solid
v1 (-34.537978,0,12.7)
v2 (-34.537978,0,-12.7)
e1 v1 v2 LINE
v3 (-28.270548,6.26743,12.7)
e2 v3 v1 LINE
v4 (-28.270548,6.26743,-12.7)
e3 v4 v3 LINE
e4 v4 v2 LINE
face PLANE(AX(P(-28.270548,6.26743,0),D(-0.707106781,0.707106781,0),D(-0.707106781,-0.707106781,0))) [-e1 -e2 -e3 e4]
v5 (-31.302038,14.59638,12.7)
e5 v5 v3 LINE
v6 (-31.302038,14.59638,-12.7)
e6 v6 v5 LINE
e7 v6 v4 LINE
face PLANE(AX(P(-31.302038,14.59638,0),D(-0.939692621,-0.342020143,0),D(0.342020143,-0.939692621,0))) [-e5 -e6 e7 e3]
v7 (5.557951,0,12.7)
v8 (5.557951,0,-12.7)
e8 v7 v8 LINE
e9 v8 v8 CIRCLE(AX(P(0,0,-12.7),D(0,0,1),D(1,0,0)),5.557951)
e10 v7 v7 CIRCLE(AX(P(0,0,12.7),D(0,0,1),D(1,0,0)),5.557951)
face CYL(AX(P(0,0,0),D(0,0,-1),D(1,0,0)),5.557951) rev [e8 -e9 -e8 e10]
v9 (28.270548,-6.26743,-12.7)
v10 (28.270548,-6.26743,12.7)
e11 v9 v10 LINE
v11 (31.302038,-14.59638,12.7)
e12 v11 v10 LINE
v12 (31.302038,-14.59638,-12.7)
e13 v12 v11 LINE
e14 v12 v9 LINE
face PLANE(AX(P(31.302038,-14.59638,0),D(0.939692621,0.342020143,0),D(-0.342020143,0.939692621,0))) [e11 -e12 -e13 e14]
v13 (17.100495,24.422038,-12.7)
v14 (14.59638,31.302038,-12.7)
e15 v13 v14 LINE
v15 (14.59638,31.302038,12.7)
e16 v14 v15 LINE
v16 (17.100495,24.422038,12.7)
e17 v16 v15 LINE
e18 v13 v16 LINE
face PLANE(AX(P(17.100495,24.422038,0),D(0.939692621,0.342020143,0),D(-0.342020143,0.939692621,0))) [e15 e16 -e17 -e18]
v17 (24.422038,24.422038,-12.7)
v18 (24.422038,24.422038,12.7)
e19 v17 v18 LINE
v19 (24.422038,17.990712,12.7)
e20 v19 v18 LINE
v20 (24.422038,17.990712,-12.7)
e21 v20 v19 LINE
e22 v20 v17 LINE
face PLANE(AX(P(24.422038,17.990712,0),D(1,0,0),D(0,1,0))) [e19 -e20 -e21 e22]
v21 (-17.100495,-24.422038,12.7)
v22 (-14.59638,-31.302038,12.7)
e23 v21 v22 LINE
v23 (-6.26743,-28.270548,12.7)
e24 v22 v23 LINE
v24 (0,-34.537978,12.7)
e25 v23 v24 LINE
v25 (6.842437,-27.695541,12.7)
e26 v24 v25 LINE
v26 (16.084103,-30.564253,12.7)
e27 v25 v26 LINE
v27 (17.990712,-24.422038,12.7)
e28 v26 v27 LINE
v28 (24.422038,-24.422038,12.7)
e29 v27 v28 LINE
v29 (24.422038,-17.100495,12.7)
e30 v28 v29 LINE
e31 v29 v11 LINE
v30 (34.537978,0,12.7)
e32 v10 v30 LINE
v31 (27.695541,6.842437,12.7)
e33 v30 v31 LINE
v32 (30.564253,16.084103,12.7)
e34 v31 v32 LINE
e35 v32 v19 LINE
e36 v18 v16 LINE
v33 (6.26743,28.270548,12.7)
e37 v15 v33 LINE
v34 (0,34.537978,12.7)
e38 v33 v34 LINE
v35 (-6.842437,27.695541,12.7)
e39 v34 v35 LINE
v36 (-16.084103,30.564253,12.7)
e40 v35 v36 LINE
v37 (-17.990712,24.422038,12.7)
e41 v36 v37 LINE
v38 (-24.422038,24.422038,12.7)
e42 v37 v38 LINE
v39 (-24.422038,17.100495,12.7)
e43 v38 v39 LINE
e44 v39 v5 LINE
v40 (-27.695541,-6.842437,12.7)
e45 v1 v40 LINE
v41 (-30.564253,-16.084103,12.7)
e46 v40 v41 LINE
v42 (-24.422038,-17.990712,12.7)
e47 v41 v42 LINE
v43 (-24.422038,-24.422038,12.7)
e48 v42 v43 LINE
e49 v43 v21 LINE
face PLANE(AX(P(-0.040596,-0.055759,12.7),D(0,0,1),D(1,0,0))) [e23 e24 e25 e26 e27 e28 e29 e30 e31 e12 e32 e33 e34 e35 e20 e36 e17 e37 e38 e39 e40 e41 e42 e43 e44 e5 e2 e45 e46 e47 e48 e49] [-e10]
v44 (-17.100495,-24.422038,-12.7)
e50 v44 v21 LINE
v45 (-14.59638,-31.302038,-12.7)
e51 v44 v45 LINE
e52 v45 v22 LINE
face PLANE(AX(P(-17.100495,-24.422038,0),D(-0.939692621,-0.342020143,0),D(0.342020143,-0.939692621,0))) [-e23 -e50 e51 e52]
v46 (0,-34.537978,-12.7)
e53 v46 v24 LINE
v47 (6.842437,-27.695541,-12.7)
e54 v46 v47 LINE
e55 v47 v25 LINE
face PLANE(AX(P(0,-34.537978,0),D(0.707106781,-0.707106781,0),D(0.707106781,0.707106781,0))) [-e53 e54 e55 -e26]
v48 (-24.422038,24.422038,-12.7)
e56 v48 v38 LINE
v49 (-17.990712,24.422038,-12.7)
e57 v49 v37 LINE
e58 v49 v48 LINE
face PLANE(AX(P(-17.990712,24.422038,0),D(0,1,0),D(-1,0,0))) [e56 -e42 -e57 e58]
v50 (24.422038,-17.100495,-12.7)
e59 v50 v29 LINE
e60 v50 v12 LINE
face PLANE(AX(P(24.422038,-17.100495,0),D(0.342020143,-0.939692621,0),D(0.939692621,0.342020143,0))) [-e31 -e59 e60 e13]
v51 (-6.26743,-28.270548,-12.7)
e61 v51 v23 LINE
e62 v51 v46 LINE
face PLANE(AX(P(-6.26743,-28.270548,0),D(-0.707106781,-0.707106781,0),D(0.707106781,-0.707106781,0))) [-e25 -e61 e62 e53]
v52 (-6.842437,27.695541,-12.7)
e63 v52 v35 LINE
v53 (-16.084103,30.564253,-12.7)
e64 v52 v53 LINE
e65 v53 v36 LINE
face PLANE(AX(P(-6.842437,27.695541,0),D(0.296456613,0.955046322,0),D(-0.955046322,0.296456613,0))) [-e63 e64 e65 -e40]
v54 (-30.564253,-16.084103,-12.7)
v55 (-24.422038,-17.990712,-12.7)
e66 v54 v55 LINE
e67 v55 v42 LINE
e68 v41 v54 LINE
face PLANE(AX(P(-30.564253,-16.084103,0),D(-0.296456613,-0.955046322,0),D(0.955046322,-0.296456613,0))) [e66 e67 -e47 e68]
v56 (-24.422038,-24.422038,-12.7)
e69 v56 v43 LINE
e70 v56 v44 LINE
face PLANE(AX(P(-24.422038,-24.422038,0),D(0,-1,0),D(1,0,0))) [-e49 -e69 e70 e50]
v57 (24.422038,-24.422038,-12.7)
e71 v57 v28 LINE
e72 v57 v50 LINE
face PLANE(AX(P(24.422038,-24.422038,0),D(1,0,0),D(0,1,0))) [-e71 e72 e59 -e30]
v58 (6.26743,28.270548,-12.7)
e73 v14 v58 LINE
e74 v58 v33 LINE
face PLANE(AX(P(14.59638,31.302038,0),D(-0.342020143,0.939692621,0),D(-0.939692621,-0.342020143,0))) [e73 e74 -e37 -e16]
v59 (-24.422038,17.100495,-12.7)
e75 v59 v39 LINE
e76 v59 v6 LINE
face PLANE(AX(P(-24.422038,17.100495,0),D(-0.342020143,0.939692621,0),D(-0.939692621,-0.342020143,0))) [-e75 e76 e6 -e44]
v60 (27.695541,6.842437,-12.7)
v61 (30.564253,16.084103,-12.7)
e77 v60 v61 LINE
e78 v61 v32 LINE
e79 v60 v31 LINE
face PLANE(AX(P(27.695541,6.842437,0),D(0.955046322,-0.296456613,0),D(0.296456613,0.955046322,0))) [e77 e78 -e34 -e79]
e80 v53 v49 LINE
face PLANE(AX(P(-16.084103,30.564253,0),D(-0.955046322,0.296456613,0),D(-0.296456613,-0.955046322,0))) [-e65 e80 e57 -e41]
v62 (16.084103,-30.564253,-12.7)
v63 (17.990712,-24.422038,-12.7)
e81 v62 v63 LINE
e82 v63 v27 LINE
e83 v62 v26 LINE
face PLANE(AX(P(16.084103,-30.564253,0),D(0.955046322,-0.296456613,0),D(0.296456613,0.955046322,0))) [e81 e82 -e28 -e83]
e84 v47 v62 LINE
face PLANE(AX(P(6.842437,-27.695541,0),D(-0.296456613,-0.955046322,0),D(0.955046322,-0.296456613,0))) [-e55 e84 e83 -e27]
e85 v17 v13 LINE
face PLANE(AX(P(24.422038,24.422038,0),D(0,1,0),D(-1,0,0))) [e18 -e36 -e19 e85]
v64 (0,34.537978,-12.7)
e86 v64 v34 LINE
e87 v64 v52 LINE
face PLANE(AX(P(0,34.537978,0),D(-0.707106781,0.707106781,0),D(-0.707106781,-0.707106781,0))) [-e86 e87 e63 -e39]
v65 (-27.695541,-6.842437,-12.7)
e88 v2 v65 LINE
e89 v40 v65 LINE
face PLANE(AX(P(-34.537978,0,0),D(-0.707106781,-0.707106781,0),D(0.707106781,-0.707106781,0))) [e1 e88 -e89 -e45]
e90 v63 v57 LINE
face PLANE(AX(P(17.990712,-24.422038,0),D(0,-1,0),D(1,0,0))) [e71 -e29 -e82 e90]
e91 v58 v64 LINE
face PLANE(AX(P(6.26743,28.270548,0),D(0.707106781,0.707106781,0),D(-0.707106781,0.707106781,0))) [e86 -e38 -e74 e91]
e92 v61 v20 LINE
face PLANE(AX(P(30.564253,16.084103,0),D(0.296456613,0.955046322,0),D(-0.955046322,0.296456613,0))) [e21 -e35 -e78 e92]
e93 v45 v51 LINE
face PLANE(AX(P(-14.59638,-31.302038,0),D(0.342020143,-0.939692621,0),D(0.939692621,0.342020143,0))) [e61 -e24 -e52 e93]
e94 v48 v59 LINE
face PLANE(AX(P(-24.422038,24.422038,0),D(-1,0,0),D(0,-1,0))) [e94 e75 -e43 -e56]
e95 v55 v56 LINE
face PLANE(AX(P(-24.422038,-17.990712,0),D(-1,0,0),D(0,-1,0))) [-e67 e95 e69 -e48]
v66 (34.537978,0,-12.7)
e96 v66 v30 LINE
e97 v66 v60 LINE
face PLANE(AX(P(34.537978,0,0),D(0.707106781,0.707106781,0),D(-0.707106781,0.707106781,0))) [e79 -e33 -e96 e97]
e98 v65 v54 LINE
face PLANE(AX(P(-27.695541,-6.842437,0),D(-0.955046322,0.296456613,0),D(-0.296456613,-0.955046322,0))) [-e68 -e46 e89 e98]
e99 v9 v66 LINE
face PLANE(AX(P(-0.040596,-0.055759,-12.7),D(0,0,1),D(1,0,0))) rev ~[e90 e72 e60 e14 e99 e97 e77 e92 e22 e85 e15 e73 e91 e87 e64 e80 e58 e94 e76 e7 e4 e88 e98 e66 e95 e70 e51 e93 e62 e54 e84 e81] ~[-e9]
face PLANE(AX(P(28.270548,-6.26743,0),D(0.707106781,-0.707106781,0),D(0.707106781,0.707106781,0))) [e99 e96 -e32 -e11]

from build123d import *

# Parameters (mm, degrees)
F0_R     = 5.5579508341
F1_DEPTH = 12.7


with BuildPart() as f1:
    # F0 (on Top) → F1 (new body, symmetric)
    with BuildSketch(Plane.XY):
        with BuildLine():
            ThreePointArc((27.919055077, -5.3017102181), (28.2929762045, -2.6625673927), (28.4179831732, 0))
            ThreePointArc((28.4179831732, 0), (28.2207898632, 3.3419735383), (27.6319465947, 6.6375669502))
            ThreePointArc((27.6319465947, 6.6375669502), (27.588477608, 6.8159864218), (27.5438565796, 6.9941212708))
            ThreePointArc((27.5438565796, 6.9941212708), (20.0945486094, 20.0945486094), (6.9941212708, 27.5438565796))
            ThreePointArc((6.9941212708, 27.5438565796), (6.1507773069, 27.7443635024), (5.3017102181, 27.919055077))
            ThreePointArc((5.3017102181, 27.919055077), (2.6625673927, 28.2929762045), (0, 28.4179831732))
            ThreePointArc((0, 28.4179831732), (-3.3419735383, 28.2207898632), (-6.6375669502, 27.6319465947))
            ThreePointArc((-6.6375669502, 27.6319465947), (-6.8159864218, 27.588477608), (-6.9941212708, 27.5438565796))
            ThreePointArc((-6.9941212708, 27.5438565796), (-13.3962958665, 25.0623427613), (-19.0164091945, 21.1177164717))
            ThreePointArc((-19.0164091945, 21.1177164717), (-20.5718228566, 19.6056591827), (-22.0073683293, 17.9793633605))
            ThreePointArc((-22.0073683293, 17.9793633605), (-25.3771522917, 12.7899143545), (-27.5438565796, 6.9941212708))
            ThreePointArc((-27.5438565796, 6.9941212708), (-27.7443635024, 6.1507773069), (-27.919055077, 5.3017102181))
            ThreePointArc((-27.919055077, 5.3017102181), (-28.409770001, -0.6831808855), (-27.6319465947, -6.6375669502))
            ThreePointArc((-27.6319465947, -6.6375669502), (-27.588477608, -6.8159864218), (-27.5438565796, -6.9941212708))
            ThreePointArc((-27.5438565796, -6.9941212708), (-26.2547930089, -10.8750913416), (-24.4220383465, -14.5308571885))
            ThreePointArc((-24.4220383465, -14.5308571885), (-22.8800647164, -16.8548036537), (-21.1177164717, -19.0164091945))
            ThreePointArc((-21.1177164717, -19.0164091945), (-19.6056591827, -20.5718228566), (-17.9793633605, -22.0073683293))
            ThreePointArc((-17.9793633605, -22.0073683293), (-16.2998855168, -23.2786490109), (-14.5308571885, -24.4220383465))
            ThreePointArc((-14.5308571885, -24.4220383465), (-10.8750913416, -26.2547930089), (-6.9941212708, -27.5438565796))
            ThreePointArc((-6.9941212708, -27.5438565796), (-6.1507773069, -27.7443635024), (-5.3017102181, -27.919055077))
            ThreePointArc((-5.3017102181, -27.919055077), (-2.6625673927, -28.2929762045), (0, -28.4179831732))
            ThreePointArc((0, -28.4179831732), (3.3419735383, -28.2207898632), (6.6375669502, -27.6319465947))
            ThreePointArc((6.6375669502, -27.6319465947), (6.8159864218, -27.588477608), (6.9941212708, -27.5438565796))
            ThreePointArc((6.9941212708, -27.5438565796), (10.8750913416, -26.2547930089), (14.5308571885, -24.4220383465))
            ThreePointArc((14.5308571885, -24.4220383465), (16.8548036537, -22.8800647164), (19.0164091945, -21.1177164717))
            ThreePointArc((19.0164091945, -21.1177164717), (20.5718228566, -19.6056591827), (22.0073683293, -17.9793633605))
            ThreePointArc((22.0073683293, -17.9793633605), (23.2786490109, -16.2998855168), (24.4220383465, -14.5308571885))
            ThreePointArc((24.4220383465, -14.5308571885), (26.2547930089, -10.8750913416), (27.5438565796, -6.9941212708))
            ThreePointArc((27.5438565796, -6.9941212708), (27.7443635024, -6.1507773069), (27.919055077, -5.3017102181))
        make_face()
        Circle(F0_R, mode=Mode.SUBTRACT)
        with BuildLine():
            ThreePointArc((27.6319465947, 6.6375669502), (28.2207898632, 3.3419735383), (28.4179831732, 0))
            ThreePointArc((28.4179831732, 0), (28.2929762045, -2.6625673927), (27.919055077, -5.3017102181))
            Line((27.919055077, -5.3017102181), (28.2705482037, -6.2674296468))
            Line((28.2705482037, -6.2674296468), (34.5379778505, 0))
            Line((34.5379778505, 0), (27.6955405475, 6.8424373029))
            Line((27.6955405475, 6.8424373029), (27.6319465947, 6.6375669502))
        make_face()
        with BuildLine():
            ThreePointArc((27.5438565796, 6.9941212708), (27.588477608, 6.8159864218), (27.6319465947, 6.6375669502))
            Line((27.6319465947, 6.6375669502), (27.6955405475, 6.8424373029))
            Line((27.6955405475, 6.8424373029), (27.5438565796, 6.9941212708))
        make_face()
        with BuildLine():
            Line((28.2705482037, -6.2674296468), (27.919055077, -5.3017102181))
            ThreePointArc((27.919055077, -5.3017102181), (27.7443635024, -6.1507773069), (27.5438565796, -6.9941212708))
            Line((27.5438565796, -6.9941212708), (28.2705482037, -6.2674296468))
        make_face()
        with BuildLine():
            ThreePointArc((6.9941212708, 27.5438565796), (20.0945486094, 20.0945486094), (27.5438565796, 6.9941212708))
            Line((27.5438565796, 6.9941212708), (27.6955405475, 6.8424373029))
            Line((27.6955405475, 6.8424373029), (30.5642526553, 16.0841031339))
            Line((30.5642526553, 16.0841031339), (24.4220383465, 17.9907122754))
            Line((24.4220383465, 17.9907122754), (24.4220383465, 24.4220383465))
            Line((24.4220383465, 24.4220383465), (17.1004953487, 24.4220383465))
            Line((17.1004953487, 24.4220383465), (14.5963801632, 31.3020382744))
            Line((14.5963801632, 31.3020382744), (6.2674296468, 28.2705482037))
            Line((6.2674296468, 28.2705482037), (6.9941212708, 27.5438565796))
        make_face()
        with BuildLine():
            Line((28.2705482037, -6.2674296468), (27.5438565796, -6.9941212708))
            ThreePointArc((27.5438565796, -6.9941212708), (26.2547930089, -10.8750913416), (24.4220383465, -14.5308571885))
            Line((24.4220383465, -14.5308571885), (24.4220383465, -17.1004953487))
            Line((24.4220383465, -17.1004953487), (31.3020382744, -14.5963801632))
            Line((31.3020382744, -14.5963801632), (28.2705482037, -6.2674296468))
        make_face()
        with BuildLine():
            ThreePointArc((5.3017102181, 27.919055077), (6.1507773069, 27.7443635024), (6.9941212708, 27.5438565796))
            Line((6.9941212708, 27.5438565796), (6.2674296468, 28.2705482037))
            Line((6.2674296468, 28.2705482037), (5.3017102181, 27.919055077))
        make_face()
        with BuildLine():
            Line((24.4220383465, -17.1004953487), (24.4220383465, -14.5308571885))
            ThreePointArc((24.4220383465, -14.5308571885), (23.2786490109, -16.2998855168), (22.0073683293, -17.9793633605))
            Line((22.0073683293, -17.9793633605), (24.4220383465, -17.1004953487))
        make_face()
        with BuildLine():
            ThreePointArc((0, 28.4179831732), (2.6625673927, 28.2929762045), (5.3017102181, 27.919055077))
            Line((5.3017102181, 27.919055077), (6.2674296468, 28.2705482037))
            Line((6.2674296468, 28.2705482037), (0, 34.5379778505))
            Line((0, 34.5379778505), (-6.8424373029, 27.6955405475))
            Line((-6.8424373029, 27.6955405475), (-6.6375669502, 27.6319465947))
            ThreePointArc((-6.6375669502, 27.6319465947), (-3.3419735383, 28.2207898632), (0, 28.4179831732))
        make_face()
        with BuildLine():
            Line((24.4220383465, -17.1004953487), (22.0073683293, -17.9793633605))
            ThreePointArc((22.0073683293, -17.9793633605), (20.5718228566, -19.6056591827), (19.0164091945, -21.1177164717))
            Line((19.0164091945, -21.1177164717), (17.9907122754, -24.4220383465))
            Line((17.9907122754, -24.4220383465), (24.4220383465, -24.4220383465))
            Line((24.4220383465, -24.4220383465), (24.4220383465, -17.1004953487))
        make_face()
        with BuildLine():
            Line((17.9907122754, -24.4220383465), (19.0164091945, -21.1177164717))
            ThreePointArc((19.0164091945, -21.1177164717), (16.8548036537, -22.8800647164), (14.5308571885, -24.4220383465))
            Line((14.5308571885, -24.4220383465), (17.9907122754, -24.4220383465))
        make_face()
        with BuildLine():
            ThreePointArc((-6.9941212708, 27.5438565796), (-6.8159864218, 27.588477608), (-6.6375669502, 27.6319465947))
            Line((-6.6375669502, 27.6319465947), (-6.8424373029, 27.6955405475))
            Line((-6.8424373029, 27.6955405475), (-6.9941212708, 27.5438565796))
        make_face()
        with BuildLine():
            Line((-6.9941212708, 27.5438565796), (-6.8424373029, 27.6955405475))
            Line((-6.8424373029, 27.6955405475), (-16.0841031339, 30.5642526553))
            Line((-16.0841031339, 30.5642526553), (-17.9907122754, 24.4220383465))
            Line((-17.9907122754, 24.4220383465), (-24.4220383465, 24.4220383465))
            Line((-24.4220383465, 24.4220383465), (-24.4220383465, 17.1004953487))
            Line((-24.4220383465, 17.1004953487), (-31.3020382744, 14.5963801632))
            Line((-31.3020382744, 14.5963801632), (-28.2705482037, 6.2674296468))
            Line((-28.2705482037, 6.2674296468), (-27.5438565796, 6.9941212708))
            ThreePointArc((-27.5438565796, 6.9941212708), (-25.3771522917, 12.7899143545), (-22.0073683293, 17.9793633605))
            ThreePointArc((-22.0073683293, 17.9793633605), (-20.5718228566, 19.6056591827), (-19.0164091945, 21.1177164717))
            ThreePointArc((-19.0164091945, 21.1177164717), (-13.3962958665, 25.0623427613), (-6.9941212708, 27.5438565796))
        make_face()
        with BuildLine():
            Line((17.9907122754, -24.4220383465), (14.5308571885, -24.4220383465))
            ThreePointArc((14.5308571885, -24.4220383465), (10.8750913416, -26.2547930089), (6.9941212708, -27.5438565796))
            Line((6.9941212708, -27.5438565796), (6.8424373029, -27.6955405475))
            Line((6.8424373029, -27.6955405475), (16.0841031339, -30.5642526553))
            Line((16.0841031339, -30.5642526553), (17.9907122754, -24.4220383465))
        make_face()
        with BuildLine():
            Line((6.8424373029, -27.6955405475), (6.9941212708, -27.5438565796))
            ThreePointArc((6.9941212708, -27.5438565796), (6.8159864218, -27.588477608), (6.6375669502, -27.6319465947))
            Line((6.6375669502, -27.6319465947), (6.8424373029, -27.6955405475))
        make_face()
        with BuildLine():
            Line((6.8424373029, -27.6955405475), (6.6375669502, -27.6319465947))
            ThreePointArc((6.6375669502, -27.6319465947), (3.3419735383, -28.2207898632), (0, -28.4179831732))
            ThreePointArc((0, -28.4179831732), (-2.6625673927, -28.2929762045), (-5.3017102181, -27.919055077))
            Line((-5.3017102181, -27.919055077), (-6.2674296468, -28.2705482037))
            Line((-6.2674296468, -28.2705482037), (0, -34.5379778505))
            Line((0, -34.5379778505), (6.8424373029, -27.6955405475))
        make_face()
        with BuildLine():
            ThreePointArc((-27.919055077, 5.3017102181), (-27.7443635024, 6.1507773069), (-27.5438565796, 6.9941212708))
            Line((-27.5438565796, 6.9941212708), (-28.2705482037, 6.2674296468))
            Line((-28.2705482037, 6.2674296468), (-27.919055077, 5.3017102181))
        make_face()
        with BuildLine():
            Line((-6.2674296468, -28.2705482037), (-5.3017102181, -27.919055077))
            ThreePointArc((-5.3017102181, -27.919055077), (-6.1507773069, -27.7443635024), (-6.9941212708, -27.5438565796))
            Line((-6.9941212708, -27.5438565796), (-6.2674296468, -28.2705482037))
        make_face()
        with BuildLine():
            Line((-14.5963801632, -31.3020382744), (-6.2674296468, -28.2705482037))
            Line((-6.2674296468, -28.2705482037), (-6.9941212708, -27.5438565796))
            ThreePointArc((-6.9941212708, -27.5438565796), (-10.8750913416, -26.2547930089), (-14.5308571885, -24.4220383465))
            Line((-14.5308571885, -24.4220383465), (-17.1004953487, -24.4220383465))
            Line((-17.1004953487, -24.4220383465), (-14.5963801632, -31.3020382744))
        make_face()
        with BuildLine():
            ThreePointArc((-27.6319465947, -6.6375669502), (-28.409770001, -0.6831808855), (-27.919055077, 5.3017102181))
            Line((-27.919055077, 5.3017102181), (-28.2705482037, 6.2674296468))
            Line((-28.2705482037, 6.2674296468), (-34.5379778505, 0))
            Line((-34.5379778505, 0), (-27.6955405475, -6.8424373029))
            Line((-27.6955405475, -6.8424373029), (-27.6319465947, -6.6375669502))
        make_face()
        with BuildLine():
            ThreePointArc((-27.5438565796, -6.9941212708), (-27.588477608, -6.8159864218), (-27.6319465947, -6.6375669502))
            Line((-27.6319465947, -6.6375669502), (-27.6955405475, -6.8424373029))
            Line((-27.6955405475, -6.8424373029), (-27.5438565796, -6.9941212708))
        make_face()
        with BuildLine():
            Line((-17.1004953487, -24.4220383465), (-14.5308571885, -24.4220383465))
            ThreePointArc((-14.5308571885, -24.4220383465), (-16.2998855168, -23.2786490109), (-17.9793633605, -22.0073683293))
            Line((-17.9793633605, -22.0073683293), (-17.1004953487, -24.4220383465))
        make_face()
        with BuildLine():
            Line((-24.4220383465, -24.4220383465), (-17.1004953487, -24.4220383465))
            Line((-17.1004953487, -24.4220383465), (-17.9793633605, -22.0073683293))
            ThreePointArc((-17.9793633605, -22.0073683293), (-19.6056591827, -20.5718228566), (-21.1177164717, -19.0164091945))
            Line((-21.1177164717, -19.0164091945), (-24.4220383465, -17.9907122754))
            Line((-24.4220383465, -17.9907122754), (-24.4220383465, -24.4220383465))
        make_face()
        with BuildLine():
            ThreePointArc((-24.4220383465, -14.5308571885), (-26.2547930089, -10.8750913416), (-27.5438565796, -6.9941212708))
            Line((-27.5438565796, -6.9941212708), (-27.6955405475, -6.8424373029))
            Line((-27.6955405475, -6.8424373029), (-30.5642526553, -16.0841031339))
            Line((-30.5642526553, -16.0841031339), (-24.4220383465, -17.9907122754))
            Line((-24.4220383465, -17.9907122754), (-24.4220383465, -14.5308571885))
        make_face()
        with BuildLine():
            ThreePointArc((-21.1177164717, -19.0164091945), (-22.8800647164, -16.8548036537), (-24.4220383465, -14.5308571885))
            Line((-24.4220383465, -14.5308571885), (-24.4220383465, -17.9907122754))
            Line((-24.4220383465, -17.9907122754), (-21.1177164717, -19.0164091945))
        make_face()
    extrude(amount=F1_DEPTH, both=True)


solid = f1.part
